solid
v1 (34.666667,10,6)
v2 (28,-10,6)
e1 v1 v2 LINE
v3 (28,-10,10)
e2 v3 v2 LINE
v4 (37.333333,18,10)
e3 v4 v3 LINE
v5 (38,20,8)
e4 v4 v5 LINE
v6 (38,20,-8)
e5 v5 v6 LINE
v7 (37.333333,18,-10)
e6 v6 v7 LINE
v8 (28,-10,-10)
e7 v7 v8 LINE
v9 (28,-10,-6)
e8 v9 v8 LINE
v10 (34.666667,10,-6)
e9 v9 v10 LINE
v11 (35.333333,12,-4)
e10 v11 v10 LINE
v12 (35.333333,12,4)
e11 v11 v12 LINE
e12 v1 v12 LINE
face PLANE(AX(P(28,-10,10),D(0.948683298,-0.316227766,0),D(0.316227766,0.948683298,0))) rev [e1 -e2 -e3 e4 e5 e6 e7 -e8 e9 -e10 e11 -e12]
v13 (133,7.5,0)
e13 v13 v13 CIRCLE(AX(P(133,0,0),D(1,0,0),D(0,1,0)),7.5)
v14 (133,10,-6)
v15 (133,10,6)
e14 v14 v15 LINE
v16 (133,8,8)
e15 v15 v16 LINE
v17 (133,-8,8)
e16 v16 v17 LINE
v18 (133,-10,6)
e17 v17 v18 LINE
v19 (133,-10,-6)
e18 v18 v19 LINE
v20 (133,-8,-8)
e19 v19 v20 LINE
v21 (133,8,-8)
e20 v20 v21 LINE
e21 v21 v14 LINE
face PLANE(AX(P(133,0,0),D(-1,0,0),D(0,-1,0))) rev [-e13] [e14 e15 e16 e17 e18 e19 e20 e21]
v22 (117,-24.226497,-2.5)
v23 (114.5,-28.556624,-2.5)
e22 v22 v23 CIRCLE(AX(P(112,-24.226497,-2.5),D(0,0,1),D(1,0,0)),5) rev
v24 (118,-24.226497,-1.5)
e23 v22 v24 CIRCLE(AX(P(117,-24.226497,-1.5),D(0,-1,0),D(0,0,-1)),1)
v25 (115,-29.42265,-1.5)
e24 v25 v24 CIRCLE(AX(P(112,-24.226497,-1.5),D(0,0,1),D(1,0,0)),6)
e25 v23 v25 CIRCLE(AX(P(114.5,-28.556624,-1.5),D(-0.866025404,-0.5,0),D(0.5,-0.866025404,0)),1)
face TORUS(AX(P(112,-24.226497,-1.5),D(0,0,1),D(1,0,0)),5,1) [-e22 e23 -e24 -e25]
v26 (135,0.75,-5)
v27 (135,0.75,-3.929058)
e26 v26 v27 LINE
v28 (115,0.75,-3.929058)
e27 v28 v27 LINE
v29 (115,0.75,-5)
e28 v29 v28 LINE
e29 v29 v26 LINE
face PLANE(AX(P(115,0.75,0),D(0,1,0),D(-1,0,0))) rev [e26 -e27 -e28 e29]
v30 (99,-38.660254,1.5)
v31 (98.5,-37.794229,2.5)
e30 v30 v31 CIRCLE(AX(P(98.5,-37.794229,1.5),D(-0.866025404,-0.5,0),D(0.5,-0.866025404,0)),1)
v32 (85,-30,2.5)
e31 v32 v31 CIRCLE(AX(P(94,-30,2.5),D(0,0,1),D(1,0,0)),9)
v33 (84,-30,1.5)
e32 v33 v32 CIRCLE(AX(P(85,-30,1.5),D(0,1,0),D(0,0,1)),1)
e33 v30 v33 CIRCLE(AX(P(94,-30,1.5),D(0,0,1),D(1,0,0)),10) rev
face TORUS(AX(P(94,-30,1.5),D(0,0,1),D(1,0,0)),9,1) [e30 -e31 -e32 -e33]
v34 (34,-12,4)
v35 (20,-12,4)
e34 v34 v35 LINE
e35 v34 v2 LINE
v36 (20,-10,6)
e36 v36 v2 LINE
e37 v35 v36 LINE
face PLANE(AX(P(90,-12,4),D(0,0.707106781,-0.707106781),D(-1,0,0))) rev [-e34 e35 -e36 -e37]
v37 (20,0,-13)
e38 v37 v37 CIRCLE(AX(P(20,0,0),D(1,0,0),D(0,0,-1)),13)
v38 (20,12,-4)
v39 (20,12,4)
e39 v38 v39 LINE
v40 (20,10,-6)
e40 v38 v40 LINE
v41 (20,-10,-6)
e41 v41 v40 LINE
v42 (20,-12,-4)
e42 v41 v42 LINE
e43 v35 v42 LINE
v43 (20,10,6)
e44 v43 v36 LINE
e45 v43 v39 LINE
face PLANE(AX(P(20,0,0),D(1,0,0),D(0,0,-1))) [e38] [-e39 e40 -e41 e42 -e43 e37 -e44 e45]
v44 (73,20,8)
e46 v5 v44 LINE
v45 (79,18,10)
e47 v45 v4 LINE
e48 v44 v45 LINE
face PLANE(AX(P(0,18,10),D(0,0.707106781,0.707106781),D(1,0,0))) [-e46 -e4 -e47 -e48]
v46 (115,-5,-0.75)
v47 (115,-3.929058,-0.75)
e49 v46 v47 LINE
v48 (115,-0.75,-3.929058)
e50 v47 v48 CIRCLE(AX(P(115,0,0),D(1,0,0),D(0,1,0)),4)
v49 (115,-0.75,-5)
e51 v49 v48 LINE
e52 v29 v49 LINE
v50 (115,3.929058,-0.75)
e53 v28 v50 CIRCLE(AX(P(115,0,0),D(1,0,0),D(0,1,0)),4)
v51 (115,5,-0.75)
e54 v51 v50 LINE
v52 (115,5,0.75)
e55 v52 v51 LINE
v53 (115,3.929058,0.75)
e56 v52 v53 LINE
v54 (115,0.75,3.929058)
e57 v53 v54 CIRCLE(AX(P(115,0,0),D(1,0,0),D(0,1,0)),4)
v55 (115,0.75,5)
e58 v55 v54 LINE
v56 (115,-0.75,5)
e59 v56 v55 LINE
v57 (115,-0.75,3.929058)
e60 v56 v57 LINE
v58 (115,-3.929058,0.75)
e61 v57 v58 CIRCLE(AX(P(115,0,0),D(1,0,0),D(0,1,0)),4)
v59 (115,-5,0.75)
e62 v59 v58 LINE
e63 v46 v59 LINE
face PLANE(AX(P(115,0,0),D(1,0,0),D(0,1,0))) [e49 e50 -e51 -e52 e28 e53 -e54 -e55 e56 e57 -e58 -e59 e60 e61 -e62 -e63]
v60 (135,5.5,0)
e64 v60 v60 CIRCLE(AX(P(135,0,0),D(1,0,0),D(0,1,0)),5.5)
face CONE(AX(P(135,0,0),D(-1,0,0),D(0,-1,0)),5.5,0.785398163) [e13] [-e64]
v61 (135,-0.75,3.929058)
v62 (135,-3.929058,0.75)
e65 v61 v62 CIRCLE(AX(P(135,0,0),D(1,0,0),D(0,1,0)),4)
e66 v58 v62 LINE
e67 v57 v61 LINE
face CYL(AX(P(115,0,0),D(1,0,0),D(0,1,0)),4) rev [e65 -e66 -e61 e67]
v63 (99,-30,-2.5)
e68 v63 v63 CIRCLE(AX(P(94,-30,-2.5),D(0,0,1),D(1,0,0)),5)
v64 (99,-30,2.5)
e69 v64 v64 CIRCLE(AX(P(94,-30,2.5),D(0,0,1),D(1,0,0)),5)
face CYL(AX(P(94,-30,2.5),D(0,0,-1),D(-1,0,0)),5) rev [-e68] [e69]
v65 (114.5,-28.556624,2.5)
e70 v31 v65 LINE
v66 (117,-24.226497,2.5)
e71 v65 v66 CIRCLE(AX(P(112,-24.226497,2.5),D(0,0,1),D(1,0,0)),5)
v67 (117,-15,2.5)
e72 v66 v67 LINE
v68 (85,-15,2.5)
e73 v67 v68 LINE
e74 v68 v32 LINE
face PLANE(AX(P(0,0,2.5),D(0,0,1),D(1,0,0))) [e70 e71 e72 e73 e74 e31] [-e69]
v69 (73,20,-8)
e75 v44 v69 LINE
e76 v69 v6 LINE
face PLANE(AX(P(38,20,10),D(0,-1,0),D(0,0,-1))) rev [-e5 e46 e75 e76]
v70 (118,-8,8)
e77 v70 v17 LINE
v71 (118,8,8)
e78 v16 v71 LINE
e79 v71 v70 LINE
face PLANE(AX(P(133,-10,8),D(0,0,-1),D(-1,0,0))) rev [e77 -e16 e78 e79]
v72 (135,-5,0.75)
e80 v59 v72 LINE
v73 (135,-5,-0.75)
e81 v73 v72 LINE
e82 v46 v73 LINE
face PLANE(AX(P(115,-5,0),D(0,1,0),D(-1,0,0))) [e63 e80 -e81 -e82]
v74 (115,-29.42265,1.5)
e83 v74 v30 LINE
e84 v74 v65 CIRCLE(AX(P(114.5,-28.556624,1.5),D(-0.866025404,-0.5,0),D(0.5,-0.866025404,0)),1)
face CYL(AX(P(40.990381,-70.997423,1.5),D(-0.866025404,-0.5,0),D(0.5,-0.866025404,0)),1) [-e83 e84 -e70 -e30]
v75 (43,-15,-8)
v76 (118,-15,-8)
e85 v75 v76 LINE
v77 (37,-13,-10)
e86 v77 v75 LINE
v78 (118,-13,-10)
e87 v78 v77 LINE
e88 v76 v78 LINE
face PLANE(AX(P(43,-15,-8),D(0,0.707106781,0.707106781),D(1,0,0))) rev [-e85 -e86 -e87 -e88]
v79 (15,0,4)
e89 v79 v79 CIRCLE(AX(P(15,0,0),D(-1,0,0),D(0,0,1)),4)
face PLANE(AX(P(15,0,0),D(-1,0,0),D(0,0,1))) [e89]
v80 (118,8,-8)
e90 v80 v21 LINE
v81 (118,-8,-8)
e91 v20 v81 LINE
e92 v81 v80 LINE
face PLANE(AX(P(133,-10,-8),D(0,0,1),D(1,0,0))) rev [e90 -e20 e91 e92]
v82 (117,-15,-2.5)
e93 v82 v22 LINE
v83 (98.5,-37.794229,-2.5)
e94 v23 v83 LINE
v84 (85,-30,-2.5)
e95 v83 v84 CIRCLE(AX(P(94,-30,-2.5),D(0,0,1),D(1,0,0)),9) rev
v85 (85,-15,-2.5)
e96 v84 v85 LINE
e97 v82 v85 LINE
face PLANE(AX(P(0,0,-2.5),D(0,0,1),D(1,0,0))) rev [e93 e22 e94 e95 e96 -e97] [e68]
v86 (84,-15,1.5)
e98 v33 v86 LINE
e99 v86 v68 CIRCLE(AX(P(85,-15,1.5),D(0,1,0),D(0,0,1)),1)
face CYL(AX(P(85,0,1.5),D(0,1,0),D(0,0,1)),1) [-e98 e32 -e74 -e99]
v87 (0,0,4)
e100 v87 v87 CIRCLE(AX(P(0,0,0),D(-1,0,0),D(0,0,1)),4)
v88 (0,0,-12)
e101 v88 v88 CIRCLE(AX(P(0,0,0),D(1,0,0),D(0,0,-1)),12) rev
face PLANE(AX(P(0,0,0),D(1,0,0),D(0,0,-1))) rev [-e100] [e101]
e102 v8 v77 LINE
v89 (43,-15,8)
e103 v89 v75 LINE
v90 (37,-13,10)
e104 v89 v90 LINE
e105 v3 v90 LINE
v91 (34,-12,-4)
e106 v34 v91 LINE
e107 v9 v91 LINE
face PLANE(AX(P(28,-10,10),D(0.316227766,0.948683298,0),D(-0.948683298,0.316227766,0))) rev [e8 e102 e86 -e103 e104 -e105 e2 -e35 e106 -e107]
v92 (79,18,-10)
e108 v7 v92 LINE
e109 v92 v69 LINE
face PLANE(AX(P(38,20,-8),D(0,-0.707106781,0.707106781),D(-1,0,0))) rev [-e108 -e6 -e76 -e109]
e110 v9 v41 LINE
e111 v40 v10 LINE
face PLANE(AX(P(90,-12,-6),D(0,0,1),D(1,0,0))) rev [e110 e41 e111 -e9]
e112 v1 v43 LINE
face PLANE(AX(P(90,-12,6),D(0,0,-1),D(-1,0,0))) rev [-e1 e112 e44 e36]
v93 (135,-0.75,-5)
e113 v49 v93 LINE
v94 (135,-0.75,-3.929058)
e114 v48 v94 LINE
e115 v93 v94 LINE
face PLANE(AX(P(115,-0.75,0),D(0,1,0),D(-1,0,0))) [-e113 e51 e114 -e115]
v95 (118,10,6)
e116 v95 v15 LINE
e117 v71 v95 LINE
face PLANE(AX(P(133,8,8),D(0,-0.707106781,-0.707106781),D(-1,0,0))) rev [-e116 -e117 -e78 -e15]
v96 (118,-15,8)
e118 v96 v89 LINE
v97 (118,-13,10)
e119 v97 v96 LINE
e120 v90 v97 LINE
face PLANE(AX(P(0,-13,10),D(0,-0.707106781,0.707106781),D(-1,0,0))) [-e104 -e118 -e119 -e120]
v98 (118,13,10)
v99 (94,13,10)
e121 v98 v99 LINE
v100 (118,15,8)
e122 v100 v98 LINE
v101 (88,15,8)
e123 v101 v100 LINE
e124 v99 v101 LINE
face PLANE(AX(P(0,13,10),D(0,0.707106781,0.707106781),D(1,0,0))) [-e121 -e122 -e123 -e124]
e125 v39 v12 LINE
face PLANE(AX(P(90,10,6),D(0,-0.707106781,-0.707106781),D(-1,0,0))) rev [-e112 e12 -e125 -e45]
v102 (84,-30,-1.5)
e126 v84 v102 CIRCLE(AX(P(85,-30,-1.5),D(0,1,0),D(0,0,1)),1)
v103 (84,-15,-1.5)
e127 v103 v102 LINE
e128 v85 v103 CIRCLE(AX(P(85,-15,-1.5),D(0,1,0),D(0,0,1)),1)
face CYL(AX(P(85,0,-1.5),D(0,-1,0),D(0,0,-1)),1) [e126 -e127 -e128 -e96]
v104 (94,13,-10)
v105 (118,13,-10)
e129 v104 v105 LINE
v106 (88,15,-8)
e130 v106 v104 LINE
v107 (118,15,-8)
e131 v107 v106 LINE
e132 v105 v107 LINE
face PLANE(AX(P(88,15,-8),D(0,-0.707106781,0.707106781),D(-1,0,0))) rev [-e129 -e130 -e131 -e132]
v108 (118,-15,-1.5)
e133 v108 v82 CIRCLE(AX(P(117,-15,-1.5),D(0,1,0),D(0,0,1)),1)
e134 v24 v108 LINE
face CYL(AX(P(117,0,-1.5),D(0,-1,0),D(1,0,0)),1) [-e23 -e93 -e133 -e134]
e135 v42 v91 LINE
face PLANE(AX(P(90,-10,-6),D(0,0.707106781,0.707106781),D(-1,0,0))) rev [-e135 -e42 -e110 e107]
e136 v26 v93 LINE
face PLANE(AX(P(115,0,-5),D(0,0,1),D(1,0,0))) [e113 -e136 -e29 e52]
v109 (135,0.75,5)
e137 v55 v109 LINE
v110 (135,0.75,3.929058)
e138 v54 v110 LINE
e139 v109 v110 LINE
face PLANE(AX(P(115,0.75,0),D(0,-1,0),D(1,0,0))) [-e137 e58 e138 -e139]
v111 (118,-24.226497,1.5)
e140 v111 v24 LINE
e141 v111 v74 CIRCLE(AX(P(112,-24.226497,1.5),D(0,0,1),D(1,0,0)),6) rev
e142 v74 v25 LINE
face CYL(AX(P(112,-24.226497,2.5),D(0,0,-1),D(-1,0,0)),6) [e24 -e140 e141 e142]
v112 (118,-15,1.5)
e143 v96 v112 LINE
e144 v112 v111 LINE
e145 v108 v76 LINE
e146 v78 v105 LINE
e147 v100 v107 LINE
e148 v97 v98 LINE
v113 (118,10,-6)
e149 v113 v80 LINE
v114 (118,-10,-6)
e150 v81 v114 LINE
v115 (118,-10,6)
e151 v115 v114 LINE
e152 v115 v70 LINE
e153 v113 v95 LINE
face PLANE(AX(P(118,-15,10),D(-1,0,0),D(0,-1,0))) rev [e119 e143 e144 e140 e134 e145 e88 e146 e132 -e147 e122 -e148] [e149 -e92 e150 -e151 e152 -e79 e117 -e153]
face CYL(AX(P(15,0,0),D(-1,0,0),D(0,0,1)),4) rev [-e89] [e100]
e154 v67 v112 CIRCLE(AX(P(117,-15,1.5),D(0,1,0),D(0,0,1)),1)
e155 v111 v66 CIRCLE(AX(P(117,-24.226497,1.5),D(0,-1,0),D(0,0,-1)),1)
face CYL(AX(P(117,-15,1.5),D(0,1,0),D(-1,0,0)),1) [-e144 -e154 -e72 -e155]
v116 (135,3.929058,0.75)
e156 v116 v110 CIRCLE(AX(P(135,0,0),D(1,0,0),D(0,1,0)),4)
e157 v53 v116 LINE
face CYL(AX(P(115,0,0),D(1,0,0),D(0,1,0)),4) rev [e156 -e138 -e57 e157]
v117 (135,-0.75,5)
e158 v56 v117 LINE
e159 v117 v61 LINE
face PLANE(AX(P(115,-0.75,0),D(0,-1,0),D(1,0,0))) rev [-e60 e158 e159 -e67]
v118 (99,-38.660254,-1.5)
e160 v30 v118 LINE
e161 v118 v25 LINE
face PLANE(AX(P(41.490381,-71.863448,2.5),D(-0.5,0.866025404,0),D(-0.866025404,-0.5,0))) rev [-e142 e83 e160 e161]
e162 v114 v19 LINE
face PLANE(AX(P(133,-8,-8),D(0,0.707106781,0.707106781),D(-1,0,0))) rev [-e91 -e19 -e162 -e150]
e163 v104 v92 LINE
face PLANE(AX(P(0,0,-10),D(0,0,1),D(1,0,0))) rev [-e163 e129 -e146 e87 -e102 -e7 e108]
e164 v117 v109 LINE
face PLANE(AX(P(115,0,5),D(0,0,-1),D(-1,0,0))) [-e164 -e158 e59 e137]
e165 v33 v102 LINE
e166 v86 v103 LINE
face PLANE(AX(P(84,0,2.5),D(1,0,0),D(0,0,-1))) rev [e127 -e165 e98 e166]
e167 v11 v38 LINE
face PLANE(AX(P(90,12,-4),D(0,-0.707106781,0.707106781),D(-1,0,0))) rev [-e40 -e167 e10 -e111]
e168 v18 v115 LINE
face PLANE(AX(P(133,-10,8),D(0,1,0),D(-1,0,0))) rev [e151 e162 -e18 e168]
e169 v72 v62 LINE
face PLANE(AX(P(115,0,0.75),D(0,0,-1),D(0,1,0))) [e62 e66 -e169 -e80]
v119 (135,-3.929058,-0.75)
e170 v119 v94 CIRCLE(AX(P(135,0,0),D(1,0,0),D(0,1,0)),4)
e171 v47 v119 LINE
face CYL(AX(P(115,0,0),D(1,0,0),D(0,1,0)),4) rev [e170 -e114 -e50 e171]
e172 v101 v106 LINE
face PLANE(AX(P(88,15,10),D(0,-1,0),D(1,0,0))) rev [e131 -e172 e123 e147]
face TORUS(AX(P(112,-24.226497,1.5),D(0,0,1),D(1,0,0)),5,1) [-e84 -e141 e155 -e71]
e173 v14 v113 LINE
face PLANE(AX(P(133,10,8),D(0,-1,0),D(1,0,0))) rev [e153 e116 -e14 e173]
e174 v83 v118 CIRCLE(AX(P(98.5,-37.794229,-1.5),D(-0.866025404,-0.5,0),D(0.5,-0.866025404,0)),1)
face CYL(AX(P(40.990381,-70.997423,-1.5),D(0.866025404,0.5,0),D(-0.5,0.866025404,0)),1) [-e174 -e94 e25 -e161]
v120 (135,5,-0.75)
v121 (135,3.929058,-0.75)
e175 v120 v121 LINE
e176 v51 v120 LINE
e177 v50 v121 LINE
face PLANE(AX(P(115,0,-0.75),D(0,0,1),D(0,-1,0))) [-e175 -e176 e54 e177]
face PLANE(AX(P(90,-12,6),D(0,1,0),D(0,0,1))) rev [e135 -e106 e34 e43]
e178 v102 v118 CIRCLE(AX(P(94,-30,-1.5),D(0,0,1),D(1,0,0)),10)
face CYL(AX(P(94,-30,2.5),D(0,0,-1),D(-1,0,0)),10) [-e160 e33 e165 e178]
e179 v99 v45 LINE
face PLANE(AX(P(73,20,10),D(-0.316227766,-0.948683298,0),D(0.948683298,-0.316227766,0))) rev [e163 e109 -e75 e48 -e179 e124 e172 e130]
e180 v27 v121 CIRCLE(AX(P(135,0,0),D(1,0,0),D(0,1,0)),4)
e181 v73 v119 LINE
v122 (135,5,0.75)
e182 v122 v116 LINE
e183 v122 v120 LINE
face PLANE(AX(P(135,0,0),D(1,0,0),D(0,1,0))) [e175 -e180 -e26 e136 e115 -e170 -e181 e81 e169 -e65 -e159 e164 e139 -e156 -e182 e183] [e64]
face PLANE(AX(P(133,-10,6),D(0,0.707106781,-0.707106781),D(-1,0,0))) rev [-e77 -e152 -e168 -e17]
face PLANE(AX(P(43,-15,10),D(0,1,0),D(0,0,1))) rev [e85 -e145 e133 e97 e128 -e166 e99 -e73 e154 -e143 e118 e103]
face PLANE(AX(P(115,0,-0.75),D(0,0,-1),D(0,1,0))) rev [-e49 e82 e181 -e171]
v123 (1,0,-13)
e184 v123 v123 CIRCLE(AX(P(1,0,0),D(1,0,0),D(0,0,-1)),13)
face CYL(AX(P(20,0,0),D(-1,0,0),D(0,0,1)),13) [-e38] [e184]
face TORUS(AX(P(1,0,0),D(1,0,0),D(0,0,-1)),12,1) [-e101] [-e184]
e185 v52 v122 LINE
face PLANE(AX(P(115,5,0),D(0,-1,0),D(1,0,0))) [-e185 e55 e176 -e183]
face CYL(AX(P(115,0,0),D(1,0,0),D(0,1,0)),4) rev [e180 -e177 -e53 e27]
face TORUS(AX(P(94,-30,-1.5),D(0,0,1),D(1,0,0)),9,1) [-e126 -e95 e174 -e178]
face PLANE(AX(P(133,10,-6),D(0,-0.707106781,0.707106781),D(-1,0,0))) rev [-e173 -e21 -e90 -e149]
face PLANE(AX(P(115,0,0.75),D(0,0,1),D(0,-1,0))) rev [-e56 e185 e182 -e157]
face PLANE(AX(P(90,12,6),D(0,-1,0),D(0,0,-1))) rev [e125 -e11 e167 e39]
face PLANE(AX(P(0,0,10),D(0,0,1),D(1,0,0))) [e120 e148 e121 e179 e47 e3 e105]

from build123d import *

# Parameters (mm, degrees)
SKETCH1_R           = 13
BOSS_EXTRUDE1_DEPTH = 20
SKETCH2_R           = 4
CUT_EXTRUDE1_DEPTH  = 15
SKETCH3_W           = 12
SKETCH3_H           = 24
BOSS_EXTRUDE2_DEPTH = 70
CHAMFER1_SIZE       = 2
BOSS_EXTRUDE3_DEPTH = 10
CHAMFER2_SIZE       = 2
SKETCH5_W           = 16
SKETCH5_H           = 20
BOSS_EXTRUDE4_DEPTH = 15
CHAMFER3_SIZE       = 2
SKETCH6_R           = 7.5
BOSS_EXTRUDE5_DEPTH = 2
CUT_EXTRUDE2_START  = -20
CUT_EXTRUDE2_DEPTH  = 20
CHAMFER4_SIZE       = 2
SKETCH8_R           = 5
BOSS_EXTRUDE6_DEPTH = 2.5
FILLET1_R           = 1
FILLET2_R           = 1


# Some blends are built 0.0001 mm under size
with BuildPart() as part:
    # Sketch1 → Boss-Extrude1 (new body)
    with BuildSketch(Plane(origin=(0, 0, 0), x_dir=(0, 0, -1), z_dir=(1, 0, 0))):
        Circle(SKETCH1_R)
    extrude(amount=BOSS_EXTRUDE1_DEPTH)

    # Sketch2 → Cut-Extrude1 (cut)
    with BuildSketch(Plane.ZY):
        Circle(SKETCH2_R)
    extrude(amount=-CUT_EXTRUDE1_DEPTH, mode=Mode.SUBTRACT)

    # Sketch3 → Boss-Extrude2 (add)
    with BuildSketch(Plane(origin=(20, 0, 0), x_dir=(0, 0, -1), z_dir=(1, 0, 0))):
        Rectangle(SKETCH3_W, SKETCH3_H)
    extrude(amount=BOSS_EXTRUDE2_DEPTH)

    # Chamfer1
    # the kernel refuses this chamfer: 2 mm, written as the material it takes off along each edge
    with BuildSketch(Plane(origin=(20, -12, -6), x_dir=(0, 0.9996219169112968, -0.027495876610586487), z_dir=(1, 0, 0)), Plane(origin=(20, 12, 6), x_dir=(0, -0.9996219169112968, 0.027495876610586487), z_dir=(1, 0, 0)), Plane(origin=(20, -12, 6), x_dir=(0, -0.027495876610586494, -0.9996219169112968), z_dir=(1, 0, 0))) as chamfer1_piece_1:
        Polygon((CHAMFER1_SIZE * 0.999621916911, CHAMFER1_SIZE * 0.0274958766106), (-CHAMFER1_SIZE * 0.0274958766106, CHAMFER1_SIZE * 0.999621916911), (0, 0), align=None)
    extrude(amount=75.143365976, mode=Mode.SUBTRACT)
    with BuildSketch(Plane(origin=(20, 12, -6), x_dir=(0, -0.9996219169112968, -0.027495876610586487), z_dir=(1, 0, 0))) as chamfer1_piece_2:
        Polygon((CHAMFER1_SIZE * 0.999621916911, -CHAMFER1_SIZE * 0.0274958766106), (-CHAMFER1_SIZE * 0.0274958766106, -CHAMFER1_SIZE * 0.999621916911), (0, 0), align=None)
    extrude(amount=75.143365976, mode=Mode.SUBTRACT)

    # Sketch4 → Boss-Extrude3 (add, symmetric)
    with BuildSketch(Plane.XY):
        Polygon((28, -10), (38, 20), (73, 20), (88, 15), (118, 15), (118, -15), (43, -15), align=None)
    extrude(amount=BOSS_EXTRUDE3_DEPTH, both=True)

    # Chamfer2
    chamfer2_edges = [part.edges().sort_by_distance(p)[0] for p in [
        (80.5, -15, -10),
        (103, 15, -10),
        (55.5, 20, -10),
        (80.5, -15, 10),
        (103, 15, 10),
        (55.5, 20, 10),
    ]]
    chamfer(chamfer2_edges, length=CHAMFER2_SIZE)

    # Sketch5 → Boss-Extrude4 (add)
    with BuildSketch(Plane(origin=(118, 0, 0), x_dir=(0, 0, -1), z_dir=(1, 0, 0))):
        Rectangle(SKETCH5_W, SKETCH5_H)
    extrude(amount=BOSS_EXTRUDE4_DEPTH)

    # Chamfer3
    chamfer3_edges = [part.edges().sort_by_distance(p)[0] for p in [
        (125.5, -10, -8),
        (125.5, 10, -8),
        (125.5, 10, 8),
        (125.5, -10, 8),
    ]]
    chamfer(chamfer3_edges, length=CHAMFER3_SIZE)

    # Sketch6 → Boss-Extrude5 (add)
    with BuildSketch(Plane(origin=(133, 0, 0), x_dir=(0, 0, -1), z_dir=(1, 0, 0))):
        with Locations(Location((0, 0, 0), (0, 0, 90))):
            Circle(SKETCH6_R)
    extrude(amount=BOSS_EXTRUDE5_DEPTH)

    # Sketch7 → Cut-Extrude2 (cut)
    with BuildSketch(Plane(origin=(135, 0, 0), x_dir=(0, 0, -1), z_dir=(1, 0, 0)).offset(CUT_EXTRUDE2_START)):
        with BuildLine():
            Line((5, -0.75), (5, 0.75))
            Line((5, 0.75), (3.929058411, 0.75))
            ThreePointArc((3.929058411, 0.75), (2.828427125, 2.828427125), (0.75, 3.929058411))
            Line((0.75, 3.929058411), (0.75, 5))
            Line((0.75, 5), (-0.75, 5))
            Line((-0.75, 5), (-0.75, 3.929058411))
            ThreePointArc((-0.75, 3.929058411), (-2.828427125, 2.828427125), (-3.929058411, 0.75))
            Line((-3.929058411, 0.75), (-5, 0.75))
            Line((-5, 0.75), (-5, -0.75))
            Line((-5, -0.75), (-3.929058411, -0.75))
            ThreePointArc((-3.929058411, -0.75), (-2.828427125, -2.828427125), (-0.75, -3.929058411))
            Line((-0.75, -3.929058411), (-0.75, -5))
            Line((-0.75, -5), (0.75, -5))
            Line((0.75, -5), (0.75, -3.929058411))
            ThreePointArc((0.75, -3.929058411), (2.828427125, -2.828427125), (3.929058411, -0.75))
            Line((3.929058411, -0.75), (5, -0.75))
        make_face()
    extrude(amount=CUT_EXTRUDE2_DEPTH, mode=Mode.SUBTRACT)

    # Chamfer4
    chamfer4_edges = [part.edges().sort_by_distance(p)[0] for p in [
        (135, -7.5, 0),
    ]]
    chamfer(chamfer4_edges, length=CHAMFER4_SIZE - 0.0001)  # a hair under: the kernel refuses the full size

    # Sketch8 → Boss-Extrude6 (add, symmetric)
    with BuildSketch(Plane.XY):
        with BuildLine():
            Line((118, -15), (84, -15))
            Line((84, -15), (84, -30))
            ThreePointArc((84, -30), (89, -38.660254038), (99, -38.660254038))
            Line((99, -38.660254038), (115, -29.422649731))
            ThreePointArc((115, -29.422649731), (117.196152423, -27.226497308), (118, -24.226497308))
            Line((118, -24.226497308), (118, -15))
        make_face()
        with Locations((94, -30)):
            Circle(SKETCH8_R, mode=Mode.SUBTRACT)
    extrude(amount=BOSS_EXTRUDE6_DEPTH, both=True)

    # Fillet1
    fillet1_edges = [part.edges().sort_by_distance(p)[0] for p in [
        (0, 0, 13),
    ]]
    fillet(fillet1_edges, radius=FILLET1_R)

    # Fillet2
    fillet2_edges = [part.edges().sort_by_distance(p)[0] for p in [
        (107, -34.041451884, -2.5),
        (117.196152423, -27.226497308, -2.5),
        (118, -19.613248654, 2.5),
        (84, -22.5, -2.5),
        (89, -38.660254038, -2.5),
        (107, -34.041451884, 2.5),
        (117.196152423, -27.226497308, 2.5),
        (84, -22.5, 2.5),
        (89, -38.660254038, 2.5),
        (118, -19.613248654, -2.5),
    ]]
    fillet(fillet2_edges, radius=FILLET2_R)


solid = part.part
